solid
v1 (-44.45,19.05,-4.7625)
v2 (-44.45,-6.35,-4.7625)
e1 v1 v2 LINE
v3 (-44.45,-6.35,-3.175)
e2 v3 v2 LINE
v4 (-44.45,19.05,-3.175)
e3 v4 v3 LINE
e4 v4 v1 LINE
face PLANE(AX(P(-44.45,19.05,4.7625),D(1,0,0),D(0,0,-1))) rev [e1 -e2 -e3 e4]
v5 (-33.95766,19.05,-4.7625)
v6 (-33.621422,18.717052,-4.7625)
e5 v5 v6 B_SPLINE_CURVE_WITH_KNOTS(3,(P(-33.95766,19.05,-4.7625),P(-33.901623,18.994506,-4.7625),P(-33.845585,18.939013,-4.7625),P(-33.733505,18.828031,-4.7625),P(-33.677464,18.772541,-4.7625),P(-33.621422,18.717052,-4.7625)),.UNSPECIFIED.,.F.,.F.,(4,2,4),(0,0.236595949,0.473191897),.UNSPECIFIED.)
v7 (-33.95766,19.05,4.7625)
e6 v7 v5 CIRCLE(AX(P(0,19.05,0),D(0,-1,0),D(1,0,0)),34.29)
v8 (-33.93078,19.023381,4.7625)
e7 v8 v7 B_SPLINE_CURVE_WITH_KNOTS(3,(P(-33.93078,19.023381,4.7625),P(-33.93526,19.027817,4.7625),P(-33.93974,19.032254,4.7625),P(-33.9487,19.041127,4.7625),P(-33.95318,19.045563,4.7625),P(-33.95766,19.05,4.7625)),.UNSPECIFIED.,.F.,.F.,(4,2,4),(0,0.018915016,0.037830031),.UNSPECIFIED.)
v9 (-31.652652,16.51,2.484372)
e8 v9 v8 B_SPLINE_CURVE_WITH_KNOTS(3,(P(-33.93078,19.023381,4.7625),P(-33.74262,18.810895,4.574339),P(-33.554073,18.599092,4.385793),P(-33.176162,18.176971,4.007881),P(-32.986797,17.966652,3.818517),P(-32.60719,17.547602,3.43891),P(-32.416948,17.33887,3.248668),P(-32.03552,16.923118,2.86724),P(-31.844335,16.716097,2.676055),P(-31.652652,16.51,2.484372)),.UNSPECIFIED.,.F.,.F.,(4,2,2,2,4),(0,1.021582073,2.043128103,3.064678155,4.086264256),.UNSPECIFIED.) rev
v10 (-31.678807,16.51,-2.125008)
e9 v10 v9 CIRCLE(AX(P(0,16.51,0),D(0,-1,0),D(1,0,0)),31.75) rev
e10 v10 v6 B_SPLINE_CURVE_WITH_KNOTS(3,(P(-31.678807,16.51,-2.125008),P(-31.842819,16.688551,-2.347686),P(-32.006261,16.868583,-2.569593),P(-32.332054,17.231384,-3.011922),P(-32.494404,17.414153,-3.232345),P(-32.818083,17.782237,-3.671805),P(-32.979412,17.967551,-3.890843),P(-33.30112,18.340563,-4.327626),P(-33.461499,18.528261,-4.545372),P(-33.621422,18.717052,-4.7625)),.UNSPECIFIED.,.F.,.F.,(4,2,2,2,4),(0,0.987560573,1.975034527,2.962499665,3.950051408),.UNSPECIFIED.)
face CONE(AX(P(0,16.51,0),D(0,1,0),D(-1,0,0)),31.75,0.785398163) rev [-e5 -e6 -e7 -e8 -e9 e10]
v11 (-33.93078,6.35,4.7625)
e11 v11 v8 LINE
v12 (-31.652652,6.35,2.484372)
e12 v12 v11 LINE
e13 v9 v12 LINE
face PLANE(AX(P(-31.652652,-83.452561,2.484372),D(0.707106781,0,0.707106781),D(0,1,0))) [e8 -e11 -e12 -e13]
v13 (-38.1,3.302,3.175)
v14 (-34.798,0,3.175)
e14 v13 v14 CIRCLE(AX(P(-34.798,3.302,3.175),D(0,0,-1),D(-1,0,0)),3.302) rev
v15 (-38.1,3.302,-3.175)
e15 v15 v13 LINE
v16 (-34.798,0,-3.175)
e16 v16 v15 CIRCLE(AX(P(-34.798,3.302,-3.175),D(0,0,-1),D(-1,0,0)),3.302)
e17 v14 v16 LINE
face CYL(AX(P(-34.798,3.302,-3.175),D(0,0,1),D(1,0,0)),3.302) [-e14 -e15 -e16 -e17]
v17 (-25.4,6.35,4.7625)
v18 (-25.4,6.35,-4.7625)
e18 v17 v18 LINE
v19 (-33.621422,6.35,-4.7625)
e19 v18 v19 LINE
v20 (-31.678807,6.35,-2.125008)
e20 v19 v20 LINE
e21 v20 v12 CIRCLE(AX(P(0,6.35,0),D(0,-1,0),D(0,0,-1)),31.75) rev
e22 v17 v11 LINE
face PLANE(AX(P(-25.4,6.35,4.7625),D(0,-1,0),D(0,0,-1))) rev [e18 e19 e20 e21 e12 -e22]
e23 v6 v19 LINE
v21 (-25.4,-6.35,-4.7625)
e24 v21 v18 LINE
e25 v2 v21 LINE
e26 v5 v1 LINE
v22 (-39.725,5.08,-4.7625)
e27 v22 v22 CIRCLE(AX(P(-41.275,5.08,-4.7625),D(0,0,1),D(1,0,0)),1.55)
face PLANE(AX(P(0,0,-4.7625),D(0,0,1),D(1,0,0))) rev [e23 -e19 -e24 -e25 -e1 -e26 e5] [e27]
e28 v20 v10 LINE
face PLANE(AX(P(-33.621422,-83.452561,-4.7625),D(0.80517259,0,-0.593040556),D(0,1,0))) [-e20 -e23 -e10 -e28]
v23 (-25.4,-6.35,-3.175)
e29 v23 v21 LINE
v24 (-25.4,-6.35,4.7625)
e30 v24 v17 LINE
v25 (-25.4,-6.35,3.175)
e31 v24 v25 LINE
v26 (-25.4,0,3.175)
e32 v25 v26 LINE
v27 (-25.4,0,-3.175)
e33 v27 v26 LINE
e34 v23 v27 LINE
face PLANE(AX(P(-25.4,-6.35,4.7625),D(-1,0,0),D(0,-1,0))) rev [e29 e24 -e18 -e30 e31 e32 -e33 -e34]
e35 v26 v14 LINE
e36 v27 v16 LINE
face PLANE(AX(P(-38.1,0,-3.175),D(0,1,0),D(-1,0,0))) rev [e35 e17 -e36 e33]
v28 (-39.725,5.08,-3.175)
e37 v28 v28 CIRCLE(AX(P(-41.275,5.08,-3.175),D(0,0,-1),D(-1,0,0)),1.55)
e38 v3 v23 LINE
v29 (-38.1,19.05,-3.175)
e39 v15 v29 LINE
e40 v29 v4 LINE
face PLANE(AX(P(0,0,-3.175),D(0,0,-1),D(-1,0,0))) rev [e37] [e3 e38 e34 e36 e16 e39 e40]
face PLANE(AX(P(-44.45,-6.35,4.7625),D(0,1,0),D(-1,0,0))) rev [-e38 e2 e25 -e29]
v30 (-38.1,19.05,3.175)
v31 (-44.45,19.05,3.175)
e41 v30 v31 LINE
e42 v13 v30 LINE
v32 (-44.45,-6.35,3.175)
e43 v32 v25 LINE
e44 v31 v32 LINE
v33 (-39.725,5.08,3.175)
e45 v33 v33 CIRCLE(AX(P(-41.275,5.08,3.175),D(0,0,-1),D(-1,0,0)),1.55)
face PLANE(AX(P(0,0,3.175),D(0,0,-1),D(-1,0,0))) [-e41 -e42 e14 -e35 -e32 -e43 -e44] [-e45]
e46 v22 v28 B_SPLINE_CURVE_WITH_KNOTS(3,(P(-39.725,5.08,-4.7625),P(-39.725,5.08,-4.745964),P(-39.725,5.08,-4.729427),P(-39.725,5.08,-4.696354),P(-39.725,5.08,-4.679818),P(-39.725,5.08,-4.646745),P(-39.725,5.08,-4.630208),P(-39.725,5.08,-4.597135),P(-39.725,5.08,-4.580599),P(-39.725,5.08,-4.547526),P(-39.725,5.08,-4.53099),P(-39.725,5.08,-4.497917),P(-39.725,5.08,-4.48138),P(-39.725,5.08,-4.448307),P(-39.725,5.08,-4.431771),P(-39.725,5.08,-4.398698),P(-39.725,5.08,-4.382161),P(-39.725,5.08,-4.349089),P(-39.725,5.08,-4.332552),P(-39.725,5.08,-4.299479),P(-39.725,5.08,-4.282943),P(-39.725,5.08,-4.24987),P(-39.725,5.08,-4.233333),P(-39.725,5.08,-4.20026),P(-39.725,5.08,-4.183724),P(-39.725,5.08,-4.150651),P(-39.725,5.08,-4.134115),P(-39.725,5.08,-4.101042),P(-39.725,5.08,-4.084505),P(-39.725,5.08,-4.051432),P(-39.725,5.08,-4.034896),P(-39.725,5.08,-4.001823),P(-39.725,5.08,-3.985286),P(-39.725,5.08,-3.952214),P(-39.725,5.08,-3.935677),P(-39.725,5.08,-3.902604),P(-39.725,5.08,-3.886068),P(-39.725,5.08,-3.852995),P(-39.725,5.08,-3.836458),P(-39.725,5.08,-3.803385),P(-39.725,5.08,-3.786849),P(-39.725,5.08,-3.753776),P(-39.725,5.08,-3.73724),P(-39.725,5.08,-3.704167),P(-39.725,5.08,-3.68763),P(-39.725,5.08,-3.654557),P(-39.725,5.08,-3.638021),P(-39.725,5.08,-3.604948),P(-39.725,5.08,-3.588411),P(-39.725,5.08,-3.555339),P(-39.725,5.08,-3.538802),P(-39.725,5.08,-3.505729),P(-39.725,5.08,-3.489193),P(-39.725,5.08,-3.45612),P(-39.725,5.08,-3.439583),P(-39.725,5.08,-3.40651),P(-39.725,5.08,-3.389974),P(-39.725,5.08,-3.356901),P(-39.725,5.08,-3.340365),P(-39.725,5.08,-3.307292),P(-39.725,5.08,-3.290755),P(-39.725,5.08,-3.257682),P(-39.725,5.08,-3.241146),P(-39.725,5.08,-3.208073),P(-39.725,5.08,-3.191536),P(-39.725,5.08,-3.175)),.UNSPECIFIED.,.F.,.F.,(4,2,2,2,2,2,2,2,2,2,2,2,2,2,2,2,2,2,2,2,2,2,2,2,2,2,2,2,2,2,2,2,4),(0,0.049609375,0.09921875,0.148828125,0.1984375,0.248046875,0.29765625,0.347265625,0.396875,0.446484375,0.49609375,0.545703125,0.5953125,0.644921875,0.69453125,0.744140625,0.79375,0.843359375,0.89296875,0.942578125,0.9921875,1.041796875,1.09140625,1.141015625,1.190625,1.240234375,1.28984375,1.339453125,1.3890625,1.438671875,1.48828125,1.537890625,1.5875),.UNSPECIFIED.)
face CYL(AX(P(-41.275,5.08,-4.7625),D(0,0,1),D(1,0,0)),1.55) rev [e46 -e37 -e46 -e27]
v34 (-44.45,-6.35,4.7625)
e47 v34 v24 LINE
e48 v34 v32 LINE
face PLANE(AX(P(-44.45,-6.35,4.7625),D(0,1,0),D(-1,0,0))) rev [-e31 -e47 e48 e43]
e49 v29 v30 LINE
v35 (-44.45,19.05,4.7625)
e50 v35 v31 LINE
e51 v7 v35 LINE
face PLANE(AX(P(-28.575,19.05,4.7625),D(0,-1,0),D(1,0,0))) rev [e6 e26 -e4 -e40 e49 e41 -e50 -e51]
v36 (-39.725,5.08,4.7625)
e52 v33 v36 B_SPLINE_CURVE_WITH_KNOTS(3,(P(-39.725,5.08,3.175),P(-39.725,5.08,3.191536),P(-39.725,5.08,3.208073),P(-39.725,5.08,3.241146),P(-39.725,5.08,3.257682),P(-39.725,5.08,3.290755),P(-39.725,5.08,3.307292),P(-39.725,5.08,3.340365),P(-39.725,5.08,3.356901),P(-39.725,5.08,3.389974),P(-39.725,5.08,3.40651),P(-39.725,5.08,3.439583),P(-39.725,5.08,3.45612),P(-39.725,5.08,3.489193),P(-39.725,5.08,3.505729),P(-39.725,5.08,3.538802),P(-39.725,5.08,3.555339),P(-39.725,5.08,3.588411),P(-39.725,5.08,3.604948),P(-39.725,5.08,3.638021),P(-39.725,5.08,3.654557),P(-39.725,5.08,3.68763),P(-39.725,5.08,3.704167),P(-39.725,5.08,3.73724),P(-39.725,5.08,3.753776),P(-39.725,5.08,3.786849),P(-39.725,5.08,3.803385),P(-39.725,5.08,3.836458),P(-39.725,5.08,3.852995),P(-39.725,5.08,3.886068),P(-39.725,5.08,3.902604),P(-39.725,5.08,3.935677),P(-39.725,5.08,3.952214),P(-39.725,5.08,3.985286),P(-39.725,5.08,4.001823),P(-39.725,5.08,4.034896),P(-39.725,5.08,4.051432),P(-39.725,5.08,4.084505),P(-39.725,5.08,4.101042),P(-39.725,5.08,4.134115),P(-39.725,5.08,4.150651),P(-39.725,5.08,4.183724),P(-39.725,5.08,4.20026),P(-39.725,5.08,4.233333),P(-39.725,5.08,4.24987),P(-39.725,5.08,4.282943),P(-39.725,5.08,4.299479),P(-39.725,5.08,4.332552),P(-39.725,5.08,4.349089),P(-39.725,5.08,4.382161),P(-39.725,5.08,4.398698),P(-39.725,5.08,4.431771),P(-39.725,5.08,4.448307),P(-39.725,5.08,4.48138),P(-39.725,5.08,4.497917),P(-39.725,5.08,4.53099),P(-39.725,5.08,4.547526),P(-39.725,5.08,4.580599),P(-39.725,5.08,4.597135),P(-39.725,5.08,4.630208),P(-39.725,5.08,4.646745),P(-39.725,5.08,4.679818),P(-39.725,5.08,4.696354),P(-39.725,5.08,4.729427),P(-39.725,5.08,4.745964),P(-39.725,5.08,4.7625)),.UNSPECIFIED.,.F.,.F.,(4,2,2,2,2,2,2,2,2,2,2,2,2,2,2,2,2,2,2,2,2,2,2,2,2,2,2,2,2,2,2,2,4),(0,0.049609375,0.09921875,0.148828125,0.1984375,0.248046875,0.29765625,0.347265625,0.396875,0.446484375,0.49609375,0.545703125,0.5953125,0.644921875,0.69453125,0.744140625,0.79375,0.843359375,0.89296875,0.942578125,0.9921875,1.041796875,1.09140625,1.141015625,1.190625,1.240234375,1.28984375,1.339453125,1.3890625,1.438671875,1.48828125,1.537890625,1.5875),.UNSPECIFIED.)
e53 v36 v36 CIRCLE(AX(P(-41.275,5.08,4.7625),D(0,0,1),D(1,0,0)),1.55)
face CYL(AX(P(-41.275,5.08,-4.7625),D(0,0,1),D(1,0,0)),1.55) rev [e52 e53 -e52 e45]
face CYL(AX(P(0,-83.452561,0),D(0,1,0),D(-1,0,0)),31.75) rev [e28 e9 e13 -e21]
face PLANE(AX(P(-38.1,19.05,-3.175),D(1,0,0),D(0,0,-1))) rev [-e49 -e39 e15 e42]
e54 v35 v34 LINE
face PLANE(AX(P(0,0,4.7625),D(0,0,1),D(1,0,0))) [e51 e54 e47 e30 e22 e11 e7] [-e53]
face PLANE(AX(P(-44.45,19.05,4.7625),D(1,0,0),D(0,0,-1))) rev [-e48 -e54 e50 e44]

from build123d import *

# Parameters (mm, degrees)
BOSS_EXTRUDE1_DEPTH = 4.7625
CUT_EXTRUDE1_DEPTH  = 3.175
FILLET1_R           = 3.302
SKETCH3_R           = 31.75
CUT_EXTRUDE2_DEPTH  = 12.7
CHAMFER1_SIZE       = 2.23064129
CHAMFER1_SIZE_2     = 2.54
SKETCH4_R           = 1.55
CUT_EXTRUDE3_DEPTH  = 50.289254661


with BuildPart() as part:
    # Sketch1 → Boss-Extrude1 (new, symmetric)
    with BuildSketch(Plane.XY):
        Polygon((-44.45, 19.05), (-44.45, -6.35), (-25.4, -6.35), (-25.4, 6.35), (-28.575, 6.35), (-28.575, 19.05), align=None)
    extrude(amount=BOSS_EXTRUDE1_DEPTH, both=True)

    # Sketch2 → Cut-Extrude1 (cut, symmetric)
    with BuildSketch(Plane.XY):
        Polygon((-44.45, 19.05), (-38.1, 19.05), (-38.1, 0), (-25.4, 0), (-25.4, -6.35), (-44.45, -6.35), align=None)
    extrude(amount=CUT_EXTRUDE1_DEPTH, both=True, mode=Mode.SUBTRACT)

    # Fillet1
    fillet1_edges = [part.edges().sort_by_distance(p)[0] for p in [
        (-38.1, 0, 0),
    ]]
    fillet(fillet1_edges, radius=FILLET1_R)

    # Sketch3 → Cut-Extrude2 (cut)
    with BuildSketch(Plane(origin=(0, 19.05, 0), x_dir=(1, 0, 0), z_dir=(0, 1, 0))):
        Circle(SKETCH3_R)
    extrude(amount=-CUT_EXTRUDE2_DEPTH, mode=Mode.SUBTRACT)

    # Chamfer1
    # the kernel refuses this chamfer: 2.54, 2.23064129 mm, written as the material it takes off along each edge
    with BuildSketch(Plane(origin=(-31.390780394, 6.35, -4.7625), x_dir=(-1, 0, 0), z_dir=(0, 1, 0))) as chamfer1_piece_1:
        with BuildLine():
            Line((CHAMFER1_SIZE, 0), (0.288027051, 2.637492029))
            ThreePointArc((0.288027051, 2.637492029), (0.17562072, 1.352980867), (0, 0))
            Line((0, 0), (CHAMFER1_SIZE, 0))
        make_face()
    extrude(amount=19.52205078, mode=Mode.SUBTRACT)
    with BuildSketch(Plane(origin=(-31.390780394, 6.35, 4.7625), x_dir=(-0.11419845391674416, 0, -0.993457957400828), z_dir=(0, 1, 0))) as chamfer1_piece_2:
        with BuildLine():
            Line((2.293129868, 0), (CHAMFER1_SIZE_2 * 0.114198453917, CHAMFER1_SIZE_2 * 0.993457957401))
            Line((CHAMFER1_SIZE_2 * 0.114198453917, CHAMFER1_SIZE_2 * 0.993457957401), (0, 0))
            ThreePointArc((0, 0), (1.178209116, 0.020693522), (2.293129868, 0))
        make_face()
    extrude(amount=19.232074789, mode=Mode.SUBTRACT)
    with BuildSketch(Plane(origin=(0, 19.05, 0), x_dir=(-0.9371917542835735, 0, -0.34881458642504903), z_dir=(0.34881458642504903, 0, -0.9371917542835735))) as chamfer1_piece_3:
        Polygon((31.75, -CHAMFER1_SIZE_2), (31.75 + CHAMFER1_SIZE_2, 0), (31.75, 0), align=None)
    revolve(axis=Axis((0, 19.05, 0), (0, 1, 0)), revolution_arc=40.829654119, mode=Mode.SUBTRACT)

    # Sketch4 → Cut-Extrude3 (cut, through all)
    with BuildSketch(Plane.XY.offset(4.7625)):
        with Locations((-41.275, 5.08)):
            Circle(SKETCH4_R)
    extrude(amount=-CUT_EXTRUDE3_DEPTH, mode=Mode.SUBTRACT)


solid = part.part
